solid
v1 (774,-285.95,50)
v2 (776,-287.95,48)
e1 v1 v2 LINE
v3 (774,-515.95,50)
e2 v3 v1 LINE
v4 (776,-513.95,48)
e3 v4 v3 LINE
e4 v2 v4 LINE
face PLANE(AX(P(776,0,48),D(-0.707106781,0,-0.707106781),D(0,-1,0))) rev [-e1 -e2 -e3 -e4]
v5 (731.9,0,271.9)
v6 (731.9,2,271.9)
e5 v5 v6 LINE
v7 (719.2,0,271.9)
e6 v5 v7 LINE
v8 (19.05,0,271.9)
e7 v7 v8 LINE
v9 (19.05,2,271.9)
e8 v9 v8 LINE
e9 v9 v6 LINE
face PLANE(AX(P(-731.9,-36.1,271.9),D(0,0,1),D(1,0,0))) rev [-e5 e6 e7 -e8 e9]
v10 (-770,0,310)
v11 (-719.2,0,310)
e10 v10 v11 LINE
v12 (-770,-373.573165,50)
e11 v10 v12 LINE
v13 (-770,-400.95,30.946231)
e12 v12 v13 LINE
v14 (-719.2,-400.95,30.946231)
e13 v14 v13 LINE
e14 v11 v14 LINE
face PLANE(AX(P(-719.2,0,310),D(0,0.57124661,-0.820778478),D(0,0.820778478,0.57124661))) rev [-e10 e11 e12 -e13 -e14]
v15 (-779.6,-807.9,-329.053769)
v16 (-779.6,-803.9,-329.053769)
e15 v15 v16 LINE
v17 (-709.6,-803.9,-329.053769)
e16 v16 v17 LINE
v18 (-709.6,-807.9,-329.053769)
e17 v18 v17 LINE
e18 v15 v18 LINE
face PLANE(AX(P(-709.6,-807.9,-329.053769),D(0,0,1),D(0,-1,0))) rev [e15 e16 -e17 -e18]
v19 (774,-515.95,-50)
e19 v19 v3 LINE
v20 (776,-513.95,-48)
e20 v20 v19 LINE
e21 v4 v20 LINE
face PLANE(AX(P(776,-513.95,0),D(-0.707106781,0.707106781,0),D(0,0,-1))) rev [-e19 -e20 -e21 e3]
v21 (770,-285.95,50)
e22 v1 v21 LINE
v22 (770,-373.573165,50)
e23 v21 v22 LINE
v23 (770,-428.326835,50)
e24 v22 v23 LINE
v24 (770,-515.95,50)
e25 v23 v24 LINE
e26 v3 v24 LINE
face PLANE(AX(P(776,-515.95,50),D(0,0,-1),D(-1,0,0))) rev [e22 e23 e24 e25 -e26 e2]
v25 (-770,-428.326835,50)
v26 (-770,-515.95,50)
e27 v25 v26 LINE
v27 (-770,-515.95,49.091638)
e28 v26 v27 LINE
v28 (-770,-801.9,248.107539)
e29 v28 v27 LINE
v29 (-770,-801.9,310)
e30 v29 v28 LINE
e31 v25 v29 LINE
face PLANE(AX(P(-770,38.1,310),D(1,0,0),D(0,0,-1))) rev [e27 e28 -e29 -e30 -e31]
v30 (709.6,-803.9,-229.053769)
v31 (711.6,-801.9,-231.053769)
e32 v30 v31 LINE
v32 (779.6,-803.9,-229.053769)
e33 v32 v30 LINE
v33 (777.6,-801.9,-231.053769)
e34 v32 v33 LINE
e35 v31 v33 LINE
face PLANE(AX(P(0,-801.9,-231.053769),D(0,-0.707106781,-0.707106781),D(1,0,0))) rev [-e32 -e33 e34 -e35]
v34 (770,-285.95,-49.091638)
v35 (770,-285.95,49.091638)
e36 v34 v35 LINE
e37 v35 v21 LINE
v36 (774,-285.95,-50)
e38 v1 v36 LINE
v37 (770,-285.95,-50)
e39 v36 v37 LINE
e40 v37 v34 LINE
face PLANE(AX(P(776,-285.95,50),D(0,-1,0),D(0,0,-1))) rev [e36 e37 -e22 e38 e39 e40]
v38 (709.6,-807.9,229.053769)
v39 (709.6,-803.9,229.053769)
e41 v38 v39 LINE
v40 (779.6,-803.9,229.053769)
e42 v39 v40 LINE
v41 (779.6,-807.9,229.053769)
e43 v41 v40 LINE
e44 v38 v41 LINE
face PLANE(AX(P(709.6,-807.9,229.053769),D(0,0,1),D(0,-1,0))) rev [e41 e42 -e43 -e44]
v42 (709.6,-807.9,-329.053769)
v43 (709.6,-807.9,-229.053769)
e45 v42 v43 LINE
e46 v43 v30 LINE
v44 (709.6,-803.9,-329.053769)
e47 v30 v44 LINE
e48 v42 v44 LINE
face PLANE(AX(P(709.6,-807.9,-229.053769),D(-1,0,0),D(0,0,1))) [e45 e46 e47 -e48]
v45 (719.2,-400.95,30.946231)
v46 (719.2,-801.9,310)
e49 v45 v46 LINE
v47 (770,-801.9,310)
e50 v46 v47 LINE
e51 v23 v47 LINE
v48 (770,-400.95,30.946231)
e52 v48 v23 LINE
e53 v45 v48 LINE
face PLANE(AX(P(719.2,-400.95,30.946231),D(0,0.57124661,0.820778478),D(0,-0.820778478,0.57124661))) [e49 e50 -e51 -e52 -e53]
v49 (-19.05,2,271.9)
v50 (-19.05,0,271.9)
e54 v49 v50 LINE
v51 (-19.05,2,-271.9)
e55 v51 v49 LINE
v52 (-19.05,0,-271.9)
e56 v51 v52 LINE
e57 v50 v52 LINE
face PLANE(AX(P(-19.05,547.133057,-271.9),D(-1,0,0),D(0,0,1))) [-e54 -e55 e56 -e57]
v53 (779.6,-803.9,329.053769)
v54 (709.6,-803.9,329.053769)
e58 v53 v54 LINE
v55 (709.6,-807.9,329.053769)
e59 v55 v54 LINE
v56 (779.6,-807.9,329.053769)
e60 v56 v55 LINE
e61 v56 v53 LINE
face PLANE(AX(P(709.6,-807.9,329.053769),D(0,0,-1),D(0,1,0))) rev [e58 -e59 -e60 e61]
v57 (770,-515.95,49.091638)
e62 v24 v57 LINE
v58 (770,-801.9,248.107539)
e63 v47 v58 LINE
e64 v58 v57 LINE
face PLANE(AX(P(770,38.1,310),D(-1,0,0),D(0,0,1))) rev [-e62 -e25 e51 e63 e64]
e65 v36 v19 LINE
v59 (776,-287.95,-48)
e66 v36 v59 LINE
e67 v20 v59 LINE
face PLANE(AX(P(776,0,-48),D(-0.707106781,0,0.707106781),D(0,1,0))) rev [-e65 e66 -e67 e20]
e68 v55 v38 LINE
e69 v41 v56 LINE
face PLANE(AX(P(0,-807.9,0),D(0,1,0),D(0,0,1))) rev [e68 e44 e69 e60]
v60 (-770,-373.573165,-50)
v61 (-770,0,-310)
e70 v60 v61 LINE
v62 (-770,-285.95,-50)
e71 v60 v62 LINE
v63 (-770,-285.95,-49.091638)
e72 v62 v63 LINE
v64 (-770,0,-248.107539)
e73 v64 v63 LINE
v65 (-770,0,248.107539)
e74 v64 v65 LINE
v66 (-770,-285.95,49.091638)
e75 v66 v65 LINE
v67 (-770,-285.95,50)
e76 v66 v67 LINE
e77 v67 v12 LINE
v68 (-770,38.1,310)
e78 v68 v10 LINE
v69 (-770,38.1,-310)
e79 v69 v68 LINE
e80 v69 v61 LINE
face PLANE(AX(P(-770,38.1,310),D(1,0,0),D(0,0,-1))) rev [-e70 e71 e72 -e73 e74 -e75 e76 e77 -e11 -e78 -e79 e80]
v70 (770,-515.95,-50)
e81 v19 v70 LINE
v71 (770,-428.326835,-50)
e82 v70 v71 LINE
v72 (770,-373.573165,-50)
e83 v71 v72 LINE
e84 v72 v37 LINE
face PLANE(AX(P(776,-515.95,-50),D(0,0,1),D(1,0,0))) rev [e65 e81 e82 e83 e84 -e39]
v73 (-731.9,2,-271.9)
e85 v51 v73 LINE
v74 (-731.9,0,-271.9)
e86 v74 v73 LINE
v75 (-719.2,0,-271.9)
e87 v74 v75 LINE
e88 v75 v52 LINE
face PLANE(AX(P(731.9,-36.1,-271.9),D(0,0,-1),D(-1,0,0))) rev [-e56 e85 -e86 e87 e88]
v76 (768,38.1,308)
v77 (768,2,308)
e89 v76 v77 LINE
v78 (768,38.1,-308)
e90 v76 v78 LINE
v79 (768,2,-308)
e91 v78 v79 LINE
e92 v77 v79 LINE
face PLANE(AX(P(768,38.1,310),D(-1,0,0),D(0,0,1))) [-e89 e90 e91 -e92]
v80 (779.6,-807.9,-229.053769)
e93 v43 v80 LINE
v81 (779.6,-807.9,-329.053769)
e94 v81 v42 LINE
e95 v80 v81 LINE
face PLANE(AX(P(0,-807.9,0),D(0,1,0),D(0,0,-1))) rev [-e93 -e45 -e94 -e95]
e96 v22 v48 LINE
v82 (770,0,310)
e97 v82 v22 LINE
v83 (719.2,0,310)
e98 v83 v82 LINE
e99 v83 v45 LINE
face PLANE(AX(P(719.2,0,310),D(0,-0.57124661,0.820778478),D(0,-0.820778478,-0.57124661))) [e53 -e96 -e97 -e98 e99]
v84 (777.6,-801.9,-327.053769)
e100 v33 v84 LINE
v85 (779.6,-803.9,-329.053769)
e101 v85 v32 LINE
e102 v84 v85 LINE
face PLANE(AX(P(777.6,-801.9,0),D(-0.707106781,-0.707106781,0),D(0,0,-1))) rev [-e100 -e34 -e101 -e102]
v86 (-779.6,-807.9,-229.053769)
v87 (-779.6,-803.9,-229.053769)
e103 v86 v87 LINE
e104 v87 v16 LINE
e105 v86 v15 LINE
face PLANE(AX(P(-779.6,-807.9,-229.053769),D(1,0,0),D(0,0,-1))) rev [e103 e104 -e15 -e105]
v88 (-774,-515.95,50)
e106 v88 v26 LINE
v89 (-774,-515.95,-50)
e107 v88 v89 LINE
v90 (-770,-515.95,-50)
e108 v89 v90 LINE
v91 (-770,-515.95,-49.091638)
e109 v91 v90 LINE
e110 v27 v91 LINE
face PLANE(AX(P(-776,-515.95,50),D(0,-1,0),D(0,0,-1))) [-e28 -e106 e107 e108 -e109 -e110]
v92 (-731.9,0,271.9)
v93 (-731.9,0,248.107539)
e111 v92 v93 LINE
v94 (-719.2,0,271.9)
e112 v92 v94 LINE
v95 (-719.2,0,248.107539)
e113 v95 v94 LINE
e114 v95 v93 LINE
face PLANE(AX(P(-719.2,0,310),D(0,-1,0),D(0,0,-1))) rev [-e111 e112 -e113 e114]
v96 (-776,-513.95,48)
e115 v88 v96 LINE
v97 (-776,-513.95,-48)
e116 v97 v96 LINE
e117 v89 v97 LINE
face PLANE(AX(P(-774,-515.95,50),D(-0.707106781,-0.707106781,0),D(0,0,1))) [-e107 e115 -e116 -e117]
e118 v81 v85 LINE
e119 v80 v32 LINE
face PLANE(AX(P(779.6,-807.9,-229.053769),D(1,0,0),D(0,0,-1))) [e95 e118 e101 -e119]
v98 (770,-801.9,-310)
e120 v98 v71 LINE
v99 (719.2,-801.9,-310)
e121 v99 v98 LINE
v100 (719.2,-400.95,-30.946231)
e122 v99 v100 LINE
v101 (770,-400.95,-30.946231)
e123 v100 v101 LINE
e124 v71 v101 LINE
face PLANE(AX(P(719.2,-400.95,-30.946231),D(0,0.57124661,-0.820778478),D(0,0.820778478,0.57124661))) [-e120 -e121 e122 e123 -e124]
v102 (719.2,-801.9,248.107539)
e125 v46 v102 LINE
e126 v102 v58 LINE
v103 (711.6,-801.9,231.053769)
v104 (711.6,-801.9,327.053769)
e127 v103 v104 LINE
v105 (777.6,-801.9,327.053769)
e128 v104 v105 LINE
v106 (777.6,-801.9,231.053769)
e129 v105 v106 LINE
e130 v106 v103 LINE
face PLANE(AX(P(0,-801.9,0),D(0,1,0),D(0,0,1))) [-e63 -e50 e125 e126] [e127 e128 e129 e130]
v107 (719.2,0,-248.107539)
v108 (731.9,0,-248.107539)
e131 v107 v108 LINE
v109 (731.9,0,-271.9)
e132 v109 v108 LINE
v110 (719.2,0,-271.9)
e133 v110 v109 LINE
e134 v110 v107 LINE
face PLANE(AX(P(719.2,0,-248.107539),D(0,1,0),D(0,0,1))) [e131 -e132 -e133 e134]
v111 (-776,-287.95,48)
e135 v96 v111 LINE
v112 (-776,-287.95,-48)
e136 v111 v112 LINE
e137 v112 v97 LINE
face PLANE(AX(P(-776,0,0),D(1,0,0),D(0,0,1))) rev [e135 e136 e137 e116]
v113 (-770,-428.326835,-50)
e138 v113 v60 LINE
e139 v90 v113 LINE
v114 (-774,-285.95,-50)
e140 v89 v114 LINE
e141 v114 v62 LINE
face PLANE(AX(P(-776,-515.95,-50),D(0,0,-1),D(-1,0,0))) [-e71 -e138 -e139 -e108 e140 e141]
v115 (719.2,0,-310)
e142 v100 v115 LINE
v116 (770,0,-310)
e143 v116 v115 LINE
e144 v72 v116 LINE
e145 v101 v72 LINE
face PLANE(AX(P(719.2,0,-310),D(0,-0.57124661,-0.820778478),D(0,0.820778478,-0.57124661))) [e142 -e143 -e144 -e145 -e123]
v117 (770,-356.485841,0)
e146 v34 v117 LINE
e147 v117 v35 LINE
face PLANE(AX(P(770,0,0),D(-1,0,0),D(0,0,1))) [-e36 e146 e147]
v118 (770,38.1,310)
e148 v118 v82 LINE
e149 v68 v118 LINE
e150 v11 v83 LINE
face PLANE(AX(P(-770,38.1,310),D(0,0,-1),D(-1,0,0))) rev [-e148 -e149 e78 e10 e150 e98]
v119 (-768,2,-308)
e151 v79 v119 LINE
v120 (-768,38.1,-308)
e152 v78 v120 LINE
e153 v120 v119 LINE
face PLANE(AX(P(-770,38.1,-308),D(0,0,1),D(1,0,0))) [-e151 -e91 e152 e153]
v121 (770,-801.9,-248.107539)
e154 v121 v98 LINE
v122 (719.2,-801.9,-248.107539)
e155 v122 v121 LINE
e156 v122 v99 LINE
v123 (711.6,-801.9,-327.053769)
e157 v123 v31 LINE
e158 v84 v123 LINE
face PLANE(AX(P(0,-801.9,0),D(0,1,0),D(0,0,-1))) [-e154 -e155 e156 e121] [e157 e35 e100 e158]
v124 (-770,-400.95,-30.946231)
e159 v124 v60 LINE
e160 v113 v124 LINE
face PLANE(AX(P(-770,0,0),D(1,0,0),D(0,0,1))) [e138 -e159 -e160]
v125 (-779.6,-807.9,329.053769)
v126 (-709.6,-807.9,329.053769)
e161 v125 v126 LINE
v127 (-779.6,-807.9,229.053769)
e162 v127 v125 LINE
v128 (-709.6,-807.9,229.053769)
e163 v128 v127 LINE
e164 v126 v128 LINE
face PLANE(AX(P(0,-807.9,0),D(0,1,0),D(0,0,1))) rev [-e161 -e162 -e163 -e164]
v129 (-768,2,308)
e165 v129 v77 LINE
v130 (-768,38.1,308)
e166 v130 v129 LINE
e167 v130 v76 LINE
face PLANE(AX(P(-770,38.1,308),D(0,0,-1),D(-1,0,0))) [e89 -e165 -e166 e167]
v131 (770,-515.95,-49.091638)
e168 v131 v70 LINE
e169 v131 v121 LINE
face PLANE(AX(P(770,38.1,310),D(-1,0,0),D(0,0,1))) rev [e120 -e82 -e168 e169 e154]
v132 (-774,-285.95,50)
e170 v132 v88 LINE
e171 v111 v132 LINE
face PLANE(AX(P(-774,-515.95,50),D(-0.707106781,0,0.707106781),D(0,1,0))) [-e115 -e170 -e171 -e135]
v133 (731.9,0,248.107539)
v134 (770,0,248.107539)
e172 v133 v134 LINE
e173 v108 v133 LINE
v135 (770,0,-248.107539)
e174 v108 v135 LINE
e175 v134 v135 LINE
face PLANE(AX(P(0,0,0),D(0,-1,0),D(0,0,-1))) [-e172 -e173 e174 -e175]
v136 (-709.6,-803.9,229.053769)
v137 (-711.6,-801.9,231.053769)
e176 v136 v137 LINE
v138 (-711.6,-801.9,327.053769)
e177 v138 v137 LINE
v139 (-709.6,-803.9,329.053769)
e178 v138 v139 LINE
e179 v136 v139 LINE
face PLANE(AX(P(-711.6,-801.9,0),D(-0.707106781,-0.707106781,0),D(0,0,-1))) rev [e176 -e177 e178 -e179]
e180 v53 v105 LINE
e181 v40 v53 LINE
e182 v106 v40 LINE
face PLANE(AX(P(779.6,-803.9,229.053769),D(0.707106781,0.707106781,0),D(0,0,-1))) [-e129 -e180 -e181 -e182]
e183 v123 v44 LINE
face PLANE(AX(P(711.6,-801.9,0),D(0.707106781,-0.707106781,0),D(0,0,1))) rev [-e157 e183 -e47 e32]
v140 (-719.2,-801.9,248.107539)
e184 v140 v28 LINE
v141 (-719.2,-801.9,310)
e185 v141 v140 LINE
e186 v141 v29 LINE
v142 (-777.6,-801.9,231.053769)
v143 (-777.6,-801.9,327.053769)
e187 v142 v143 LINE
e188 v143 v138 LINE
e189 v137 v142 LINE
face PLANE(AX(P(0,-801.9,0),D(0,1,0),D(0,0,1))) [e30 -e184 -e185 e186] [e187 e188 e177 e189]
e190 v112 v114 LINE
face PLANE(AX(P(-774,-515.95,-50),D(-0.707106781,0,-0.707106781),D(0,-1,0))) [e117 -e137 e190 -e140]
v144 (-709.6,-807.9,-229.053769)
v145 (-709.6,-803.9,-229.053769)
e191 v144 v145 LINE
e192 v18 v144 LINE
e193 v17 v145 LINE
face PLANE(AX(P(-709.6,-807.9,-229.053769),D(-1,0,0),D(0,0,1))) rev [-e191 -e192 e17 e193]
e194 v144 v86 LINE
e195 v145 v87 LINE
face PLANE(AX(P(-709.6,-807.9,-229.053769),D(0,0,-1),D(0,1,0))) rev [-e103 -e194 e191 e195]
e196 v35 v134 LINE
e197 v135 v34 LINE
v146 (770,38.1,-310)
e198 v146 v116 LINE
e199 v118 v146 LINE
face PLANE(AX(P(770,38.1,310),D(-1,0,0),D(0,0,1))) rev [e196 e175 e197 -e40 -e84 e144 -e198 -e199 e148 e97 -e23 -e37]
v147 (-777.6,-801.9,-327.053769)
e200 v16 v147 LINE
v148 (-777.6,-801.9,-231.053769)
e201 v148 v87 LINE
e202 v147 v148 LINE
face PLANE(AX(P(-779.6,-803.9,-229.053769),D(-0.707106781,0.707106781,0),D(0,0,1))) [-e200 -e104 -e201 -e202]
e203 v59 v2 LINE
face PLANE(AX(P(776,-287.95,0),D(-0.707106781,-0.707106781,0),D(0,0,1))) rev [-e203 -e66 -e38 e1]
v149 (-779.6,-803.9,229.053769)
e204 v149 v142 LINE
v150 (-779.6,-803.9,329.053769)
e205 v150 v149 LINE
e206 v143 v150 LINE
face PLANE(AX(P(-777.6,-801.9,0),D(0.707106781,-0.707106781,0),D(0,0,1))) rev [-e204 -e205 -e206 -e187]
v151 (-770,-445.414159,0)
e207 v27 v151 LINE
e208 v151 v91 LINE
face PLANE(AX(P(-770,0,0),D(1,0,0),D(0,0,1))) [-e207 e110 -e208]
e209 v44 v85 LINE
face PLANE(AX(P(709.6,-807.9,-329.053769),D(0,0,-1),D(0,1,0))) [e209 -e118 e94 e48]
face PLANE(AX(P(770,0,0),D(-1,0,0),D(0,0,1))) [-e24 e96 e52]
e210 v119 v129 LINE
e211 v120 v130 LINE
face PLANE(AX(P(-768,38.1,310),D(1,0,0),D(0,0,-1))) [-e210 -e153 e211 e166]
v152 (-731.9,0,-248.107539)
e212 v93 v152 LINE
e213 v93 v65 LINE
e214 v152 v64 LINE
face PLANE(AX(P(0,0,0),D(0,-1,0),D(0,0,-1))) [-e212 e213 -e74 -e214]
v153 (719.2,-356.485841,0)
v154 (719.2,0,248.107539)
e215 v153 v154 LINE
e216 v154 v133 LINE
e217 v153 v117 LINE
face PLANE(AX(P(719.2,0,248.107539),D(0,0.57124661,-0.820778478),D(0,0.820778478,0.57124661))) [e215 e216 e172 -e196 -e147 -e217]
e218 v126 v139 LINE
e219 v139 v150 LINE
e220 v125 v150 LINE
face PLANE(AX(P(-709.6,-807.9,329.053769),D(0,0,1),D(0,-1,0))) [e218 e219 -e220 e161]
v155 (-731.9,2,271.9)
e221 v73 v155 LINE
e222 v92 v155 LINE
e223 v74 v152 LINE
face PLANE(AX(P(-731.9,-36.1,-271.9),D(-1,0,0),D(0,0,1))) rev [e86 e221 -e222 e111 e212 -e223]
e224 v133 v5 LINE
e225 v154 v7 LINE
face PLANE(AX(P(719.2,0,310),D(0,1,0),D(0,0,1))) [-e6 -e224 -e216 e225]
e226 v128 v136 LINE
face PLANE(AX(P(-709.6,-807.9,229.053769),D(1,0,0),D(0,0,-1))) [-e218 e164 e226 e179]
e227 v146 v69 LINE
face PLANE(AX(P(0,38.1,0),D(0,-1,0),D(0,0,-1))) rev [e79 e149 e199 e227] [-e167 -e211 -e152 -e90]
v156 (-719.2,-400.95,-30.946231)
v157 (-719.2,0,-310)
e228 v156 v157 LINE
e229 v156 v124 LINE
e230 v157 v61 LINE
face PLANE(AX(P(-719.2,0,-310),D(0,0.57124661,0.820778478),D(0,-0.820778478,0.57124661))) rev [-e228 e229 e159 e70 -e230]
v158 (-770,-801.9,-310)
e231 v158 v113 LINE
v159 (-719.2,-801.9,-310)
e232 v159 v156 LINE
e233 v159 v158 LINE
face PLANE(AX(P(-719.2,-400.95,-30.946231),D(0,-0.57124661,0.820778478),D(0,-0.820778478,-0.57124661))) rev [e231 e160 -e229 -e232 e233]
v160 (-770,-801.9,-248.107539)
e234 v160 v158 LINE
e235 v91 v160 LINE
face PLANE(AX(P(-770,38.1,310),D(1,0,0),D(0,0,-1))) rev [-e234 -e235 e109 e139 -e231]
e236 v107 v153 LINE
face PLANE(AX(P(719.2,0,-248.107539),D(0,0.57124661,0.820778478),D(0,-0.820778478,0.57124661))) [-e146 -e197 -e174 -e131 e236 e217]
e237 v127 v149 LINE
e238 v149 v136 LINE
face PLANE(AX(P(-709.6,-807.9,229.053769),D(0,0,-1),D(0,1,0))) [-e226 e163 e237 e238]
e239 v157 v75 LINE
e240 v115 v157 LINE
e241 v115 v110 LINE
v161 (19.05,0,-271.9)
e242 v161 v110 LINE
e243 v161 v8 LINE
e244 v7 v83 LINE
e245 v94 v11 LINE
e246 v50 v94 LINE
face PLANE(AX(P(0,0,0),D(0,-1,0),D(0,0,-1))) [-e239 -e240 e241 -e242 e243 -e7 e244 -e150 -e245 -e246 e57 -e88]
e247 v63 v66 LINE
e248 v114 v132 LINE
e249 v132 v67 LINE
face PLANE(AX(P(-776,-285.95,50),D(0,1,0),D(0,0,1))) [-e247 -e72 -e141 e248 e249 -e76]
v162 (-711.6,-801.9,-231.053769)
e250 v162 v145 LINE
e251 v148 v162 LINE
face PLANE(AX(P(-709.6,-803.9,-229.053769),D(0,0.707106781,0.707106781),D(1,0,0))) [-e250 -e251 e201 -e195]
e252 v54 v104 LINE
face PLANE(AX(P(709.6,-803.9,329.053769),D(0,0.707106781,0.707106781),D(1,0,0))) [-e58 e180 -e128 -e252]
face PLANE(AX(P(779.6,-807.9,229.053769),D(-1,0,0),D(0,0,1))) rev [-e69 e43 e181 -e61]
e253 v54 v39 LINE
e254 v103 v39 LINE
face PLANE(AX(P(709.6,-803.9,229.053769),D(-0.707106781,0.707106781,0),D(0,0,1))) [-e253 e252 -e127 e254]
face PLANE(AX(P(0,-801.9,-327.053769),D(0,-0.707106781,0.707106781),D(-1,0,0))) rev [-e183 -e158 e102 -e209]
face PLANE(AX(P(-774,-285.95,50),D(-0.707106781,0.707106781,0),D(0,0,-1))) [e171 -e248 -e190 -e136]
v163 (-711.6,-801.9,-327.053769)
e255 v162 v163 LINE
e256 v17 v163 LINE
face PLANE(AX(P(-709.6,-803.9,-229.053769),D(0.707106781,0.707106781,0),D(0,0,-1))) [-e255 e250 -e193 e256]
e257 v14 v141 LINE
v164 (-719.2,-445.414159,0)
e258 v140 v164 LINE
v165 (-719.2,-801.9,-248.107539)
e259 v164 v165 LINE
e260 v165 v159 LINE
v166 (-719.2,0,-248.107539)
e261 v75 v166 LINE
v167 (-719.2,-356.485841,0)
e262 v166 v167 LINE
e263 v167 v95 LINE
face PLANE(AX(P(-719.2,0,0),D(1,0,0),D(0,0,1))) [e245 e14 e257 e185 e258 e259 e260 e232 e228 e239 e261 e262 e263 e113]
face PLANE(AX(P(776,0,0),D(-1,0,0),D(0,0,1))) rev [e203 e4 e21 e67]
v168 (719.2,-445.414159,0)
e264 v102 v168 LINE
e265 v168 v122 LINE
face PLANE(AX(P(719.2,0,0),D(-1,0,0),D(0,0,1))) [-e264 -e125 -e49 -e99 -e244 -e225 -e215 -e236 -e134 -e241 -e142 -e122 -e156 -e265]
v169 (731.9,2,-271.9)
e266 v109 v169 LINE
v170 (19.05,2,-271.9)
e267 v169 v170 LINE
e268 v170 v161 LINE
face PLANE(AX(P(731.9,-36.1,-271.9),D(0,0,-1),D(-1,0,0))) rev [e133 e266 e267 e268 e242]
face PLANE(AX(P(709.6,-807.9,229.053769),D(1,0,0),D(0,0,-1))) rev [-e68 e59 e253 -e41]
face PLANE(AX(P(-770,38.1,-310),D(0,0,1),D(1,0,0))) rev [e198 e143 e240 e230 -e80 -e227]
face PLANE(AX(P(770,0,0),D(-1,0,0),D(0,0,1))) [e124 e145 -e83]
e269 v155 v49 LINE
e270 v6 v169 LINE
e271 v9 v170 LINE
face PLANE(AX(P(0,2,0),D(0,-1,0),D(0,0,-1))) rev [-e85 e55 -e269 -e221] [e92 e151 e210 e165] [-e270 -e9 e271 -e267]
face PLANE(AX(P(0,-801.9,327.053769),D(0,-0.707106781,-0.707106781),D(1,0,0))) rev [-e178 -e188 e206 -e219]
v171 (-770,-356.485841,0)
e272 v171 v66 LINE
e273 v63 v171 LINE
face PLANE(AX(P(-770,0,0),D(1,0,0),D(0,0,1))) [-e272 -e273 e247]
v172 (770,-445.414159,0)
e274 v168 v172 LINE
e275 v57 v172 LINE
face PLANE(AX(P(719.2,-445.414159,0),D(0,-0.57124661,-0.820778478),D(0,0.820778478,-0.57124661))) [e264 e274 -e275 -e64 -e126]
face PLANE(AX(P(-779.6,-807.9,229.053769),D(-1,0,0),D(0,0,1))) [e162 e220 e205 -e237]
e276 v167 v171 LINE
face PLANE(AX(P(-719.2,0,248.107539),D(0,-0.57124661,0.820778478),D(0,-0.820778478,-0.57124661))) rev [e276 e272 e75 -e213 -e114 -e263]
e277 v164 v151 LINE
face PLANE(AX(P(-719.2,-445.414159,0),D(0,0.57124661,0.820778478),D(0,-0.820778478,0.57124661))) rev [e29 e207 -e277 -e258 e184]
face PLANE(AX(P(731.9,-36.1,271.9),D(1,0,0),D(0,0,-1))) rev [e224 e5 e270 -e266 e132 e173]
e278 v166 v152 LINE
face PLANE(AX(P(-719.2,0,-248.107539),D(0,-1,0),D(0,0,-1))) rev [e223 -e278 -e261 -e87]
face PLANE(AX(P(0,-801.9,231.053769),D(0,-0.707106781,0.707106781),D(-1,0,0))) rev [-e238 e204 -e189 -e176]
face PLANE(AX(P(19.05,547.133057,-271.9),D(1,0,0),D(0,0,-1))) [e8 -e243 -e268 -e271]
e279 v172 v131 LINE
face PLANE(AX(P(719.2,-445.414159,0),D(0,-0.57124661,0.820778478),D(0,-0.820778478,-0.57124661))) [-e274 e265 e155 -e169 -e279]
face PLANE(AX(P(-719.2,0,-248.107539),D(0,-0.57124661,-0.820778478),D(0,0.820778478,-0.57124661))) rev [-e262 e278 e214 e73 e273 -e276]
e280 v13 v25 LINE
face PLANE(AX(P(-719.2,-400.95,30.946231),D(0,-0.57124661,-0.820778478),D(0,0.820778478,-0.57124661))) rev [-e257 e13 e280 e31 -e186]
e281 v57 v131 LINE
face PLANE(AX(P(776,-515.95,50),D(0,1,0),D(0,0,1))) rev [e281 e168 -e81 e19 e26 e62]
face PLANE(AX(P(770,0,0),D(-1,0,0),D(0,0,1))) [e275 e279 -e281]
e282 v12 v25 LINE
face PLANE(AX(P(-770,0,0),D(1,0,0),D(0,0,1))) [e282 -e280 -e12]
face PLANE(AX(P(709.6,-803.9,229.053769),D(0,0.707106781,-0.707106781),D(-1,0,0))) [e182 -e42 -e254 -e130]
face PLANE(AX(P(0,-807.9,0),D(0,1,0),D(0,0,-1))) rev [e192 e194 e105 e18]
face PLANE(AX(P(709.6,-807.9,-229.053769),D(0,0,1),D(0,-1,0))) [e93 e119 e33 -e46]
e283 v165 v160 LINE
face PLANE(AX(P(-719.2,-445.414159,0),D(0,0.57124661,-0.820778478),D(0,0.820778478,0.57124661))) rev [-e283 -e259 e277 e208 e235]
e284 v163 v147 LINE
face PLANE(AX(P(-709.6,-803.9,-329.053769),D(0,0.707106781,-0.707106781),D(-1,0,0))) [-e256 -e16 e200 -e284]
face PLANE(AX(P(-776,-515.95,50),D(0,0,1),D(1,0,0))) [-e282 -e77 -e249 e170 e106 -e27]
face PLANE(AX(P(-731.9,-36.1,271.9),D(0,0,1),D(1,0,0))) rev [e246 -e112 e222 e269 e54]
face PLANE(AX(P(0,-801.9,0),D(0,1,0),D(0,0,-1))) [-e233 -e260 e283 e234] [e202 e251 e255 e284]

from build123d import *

# Parameters (mm, degrees)
CROQUIS1_W                 = 1540
CROQUIS1_H                 = 620
SALIENTE_EXTRUIR1_DEPTH    = 38.1
VACIADO1_T                 = -2
CROQUIS2_W                 = 1463.8
CROQUIS2_H                 = 543.8
CORTAR_EXTRUIR1_DEPTH      = 38.1
SALIENTE_EXTRUIR2_DEPTH    = 50.8
CROQUIS4_W                 = 100
CROQUIS4_H                 = 230
SALIENTE_EXTRUIR3_DEPTH    = 6
CHAFL_N1_SIZE              = 2
CROQUIS5_W                 = 70
CROQUIS5_H                 = 100
SALIENTE_EXTRUIR4_DEPTH    = 6
CHAFL_N2_SIZE              = 2
CHAFL_N2_OF_SIMETR_A2_SIZE = 2
CROQUIS6_W                 = 38.1
CROQUIS6_H                 = 543.8
SALIENTE_EXTRUIR5_DEPTH    = 2


# Read off the part's stored shape, not the designer's step: Simetría3
with BuildPart() as part:
    # Croquis1 → Saliente-Extruir1 (new body)
    with BuildSketch(Plane(origin=(0, 0, 0), x_dir=(1, 0, 0), z_dir=(0, 1, 0))):
        Rectangle(CROQUIS1_W, CROQUIS1_H)
    extrude(amount=SALIENTE_EXTRUIR1_DEPTH)

    # Vaciado1
    vaciado1_openings = [part.faces().sort_by_distance(p)[0] for p in [
        (0, 38.1, 0),
    ]]
    offset(amount=VACIADO1_T, openings=vaciado1_openings, kind=Kind.INTERSECTION)

    # Croquis2 → Cortar-Extruir1 (cut)
    with BuildSketch(Plane(origin=(0, 2, 0), x_dir=(1, 0, 0), z_dir=(0, 1, 0))):
        Rectangle(CROQUIS2_W, CROQUIS2_H)
    extrude(amount=-CORTAR_EXTRUIR1_DEPTH, mode=Mode.SUBTRACT)

    # Croquis3 → Saliente-Extruir2 (add)
    with BuildSketch(Plane(origin=(770, 0, 0), x_dir=(0, 0, -1), z_dir=(1, 0, 0))):
        Polygon((-310, 0), (-30.946230524, -400.95), (-310, -801.9), (-248.107538953, -801.9), (0, -445.414158831), (248.107538953, -801.9), (310, -801.9), (30.946230524, -400.95), (310, 0), (248.107538953, 0), (0, -356.485841169), (-248.107538953, 0), align=None)
    extrude(amount=-SALIENTE_EXTRUIR2_DEPTH)

    # Croquis4 → Saliente-Extruir3 (add)
    with BuildSketch(Plane(origin=(770, 0, 0), x_dir=(0, 0, -1), z_dir=(1, 0, 0))):
        with Locations((0, -400.95)):
            Rectangle(CROQUIS4_W, CROQUIS4_H)
    extrude(amount=SALIENTE_EXTRUIR3_DEPTH)

    # Chaflán1
    chafl_n1_edges = [part.edges().sort_by_distance(p)[0] for p in [
        (776, -400.95, -50),
        (776, -285.95, 0),
        (776, -400.95, 50),
        (776, -515.95, 0),
    ]]
    chamfer(chafl_n1_edges, length=CHAFL_N1_SIZE)

    # Croquis5 → Saliente-Extruir4 (add)
    with BuildSketch(Plane.XZ.offset(801.9)):
        with Locations((744.6, 279.053769476)):
            Rectangle(CROQUIS5_W, CROQUIS5_H)
    saliente_extruir4 = extrude(amount=SALIENTE_EXTRUIR4_DEPTH)

    # Chaflán2
    chafl_n2_edges = [part.edges().sort_by_distance(p)[0] for p in [
        (779.6, -801.9, 279.053769476),
        (744.6, -801.9, 329.053769476),
        (709.6, -801.9, 279.053769476),
        (744.6, -801.9, 229.053769476),
    ]]
    chamfer(chafl_n2_edges, length=CHAFL_N2_SIZE)

    # Simetría2: Saliente-Extruir4 across plane
    add(saliente_extruir4.mirror(Plane.XY))

    # Chaflán2 of Simetría2
    chafl_n2_of_simetr_a2_edges = [part.edges().sort_by_distance(p)[0] for p in [
        (779.6, -801.9, -279.053769476),
        (744.6, -801.9, -329.053769476),
        (709.6, -801.9, -279.053769476),
        (744.6, -801.9, -229.053769476),
    ]]
    chamfer(chafl_n2_of_simetr_a2_edges, length=CHAFL_N2_OF_SIMETR_A2_SIZE)

    # Croquis6 → Saliente-Extruir5 (add)
    with BuildSketch(Plane.XZ):
        Rectangle(CROQUIS6_W, CROQUIS6_H)
    extrude(amount=-SALIENTE_EXTRUIR5_DEPTH)

    # Simetría3: part across plane


with BuildPart() as part_1:
    add(part.part)
    add(part.part.mirror(Plane(origin=(0, 0, 0), x_dir=(0, 0, 1), z_dir=(1, 0, 0))))


solid = part_1.part
